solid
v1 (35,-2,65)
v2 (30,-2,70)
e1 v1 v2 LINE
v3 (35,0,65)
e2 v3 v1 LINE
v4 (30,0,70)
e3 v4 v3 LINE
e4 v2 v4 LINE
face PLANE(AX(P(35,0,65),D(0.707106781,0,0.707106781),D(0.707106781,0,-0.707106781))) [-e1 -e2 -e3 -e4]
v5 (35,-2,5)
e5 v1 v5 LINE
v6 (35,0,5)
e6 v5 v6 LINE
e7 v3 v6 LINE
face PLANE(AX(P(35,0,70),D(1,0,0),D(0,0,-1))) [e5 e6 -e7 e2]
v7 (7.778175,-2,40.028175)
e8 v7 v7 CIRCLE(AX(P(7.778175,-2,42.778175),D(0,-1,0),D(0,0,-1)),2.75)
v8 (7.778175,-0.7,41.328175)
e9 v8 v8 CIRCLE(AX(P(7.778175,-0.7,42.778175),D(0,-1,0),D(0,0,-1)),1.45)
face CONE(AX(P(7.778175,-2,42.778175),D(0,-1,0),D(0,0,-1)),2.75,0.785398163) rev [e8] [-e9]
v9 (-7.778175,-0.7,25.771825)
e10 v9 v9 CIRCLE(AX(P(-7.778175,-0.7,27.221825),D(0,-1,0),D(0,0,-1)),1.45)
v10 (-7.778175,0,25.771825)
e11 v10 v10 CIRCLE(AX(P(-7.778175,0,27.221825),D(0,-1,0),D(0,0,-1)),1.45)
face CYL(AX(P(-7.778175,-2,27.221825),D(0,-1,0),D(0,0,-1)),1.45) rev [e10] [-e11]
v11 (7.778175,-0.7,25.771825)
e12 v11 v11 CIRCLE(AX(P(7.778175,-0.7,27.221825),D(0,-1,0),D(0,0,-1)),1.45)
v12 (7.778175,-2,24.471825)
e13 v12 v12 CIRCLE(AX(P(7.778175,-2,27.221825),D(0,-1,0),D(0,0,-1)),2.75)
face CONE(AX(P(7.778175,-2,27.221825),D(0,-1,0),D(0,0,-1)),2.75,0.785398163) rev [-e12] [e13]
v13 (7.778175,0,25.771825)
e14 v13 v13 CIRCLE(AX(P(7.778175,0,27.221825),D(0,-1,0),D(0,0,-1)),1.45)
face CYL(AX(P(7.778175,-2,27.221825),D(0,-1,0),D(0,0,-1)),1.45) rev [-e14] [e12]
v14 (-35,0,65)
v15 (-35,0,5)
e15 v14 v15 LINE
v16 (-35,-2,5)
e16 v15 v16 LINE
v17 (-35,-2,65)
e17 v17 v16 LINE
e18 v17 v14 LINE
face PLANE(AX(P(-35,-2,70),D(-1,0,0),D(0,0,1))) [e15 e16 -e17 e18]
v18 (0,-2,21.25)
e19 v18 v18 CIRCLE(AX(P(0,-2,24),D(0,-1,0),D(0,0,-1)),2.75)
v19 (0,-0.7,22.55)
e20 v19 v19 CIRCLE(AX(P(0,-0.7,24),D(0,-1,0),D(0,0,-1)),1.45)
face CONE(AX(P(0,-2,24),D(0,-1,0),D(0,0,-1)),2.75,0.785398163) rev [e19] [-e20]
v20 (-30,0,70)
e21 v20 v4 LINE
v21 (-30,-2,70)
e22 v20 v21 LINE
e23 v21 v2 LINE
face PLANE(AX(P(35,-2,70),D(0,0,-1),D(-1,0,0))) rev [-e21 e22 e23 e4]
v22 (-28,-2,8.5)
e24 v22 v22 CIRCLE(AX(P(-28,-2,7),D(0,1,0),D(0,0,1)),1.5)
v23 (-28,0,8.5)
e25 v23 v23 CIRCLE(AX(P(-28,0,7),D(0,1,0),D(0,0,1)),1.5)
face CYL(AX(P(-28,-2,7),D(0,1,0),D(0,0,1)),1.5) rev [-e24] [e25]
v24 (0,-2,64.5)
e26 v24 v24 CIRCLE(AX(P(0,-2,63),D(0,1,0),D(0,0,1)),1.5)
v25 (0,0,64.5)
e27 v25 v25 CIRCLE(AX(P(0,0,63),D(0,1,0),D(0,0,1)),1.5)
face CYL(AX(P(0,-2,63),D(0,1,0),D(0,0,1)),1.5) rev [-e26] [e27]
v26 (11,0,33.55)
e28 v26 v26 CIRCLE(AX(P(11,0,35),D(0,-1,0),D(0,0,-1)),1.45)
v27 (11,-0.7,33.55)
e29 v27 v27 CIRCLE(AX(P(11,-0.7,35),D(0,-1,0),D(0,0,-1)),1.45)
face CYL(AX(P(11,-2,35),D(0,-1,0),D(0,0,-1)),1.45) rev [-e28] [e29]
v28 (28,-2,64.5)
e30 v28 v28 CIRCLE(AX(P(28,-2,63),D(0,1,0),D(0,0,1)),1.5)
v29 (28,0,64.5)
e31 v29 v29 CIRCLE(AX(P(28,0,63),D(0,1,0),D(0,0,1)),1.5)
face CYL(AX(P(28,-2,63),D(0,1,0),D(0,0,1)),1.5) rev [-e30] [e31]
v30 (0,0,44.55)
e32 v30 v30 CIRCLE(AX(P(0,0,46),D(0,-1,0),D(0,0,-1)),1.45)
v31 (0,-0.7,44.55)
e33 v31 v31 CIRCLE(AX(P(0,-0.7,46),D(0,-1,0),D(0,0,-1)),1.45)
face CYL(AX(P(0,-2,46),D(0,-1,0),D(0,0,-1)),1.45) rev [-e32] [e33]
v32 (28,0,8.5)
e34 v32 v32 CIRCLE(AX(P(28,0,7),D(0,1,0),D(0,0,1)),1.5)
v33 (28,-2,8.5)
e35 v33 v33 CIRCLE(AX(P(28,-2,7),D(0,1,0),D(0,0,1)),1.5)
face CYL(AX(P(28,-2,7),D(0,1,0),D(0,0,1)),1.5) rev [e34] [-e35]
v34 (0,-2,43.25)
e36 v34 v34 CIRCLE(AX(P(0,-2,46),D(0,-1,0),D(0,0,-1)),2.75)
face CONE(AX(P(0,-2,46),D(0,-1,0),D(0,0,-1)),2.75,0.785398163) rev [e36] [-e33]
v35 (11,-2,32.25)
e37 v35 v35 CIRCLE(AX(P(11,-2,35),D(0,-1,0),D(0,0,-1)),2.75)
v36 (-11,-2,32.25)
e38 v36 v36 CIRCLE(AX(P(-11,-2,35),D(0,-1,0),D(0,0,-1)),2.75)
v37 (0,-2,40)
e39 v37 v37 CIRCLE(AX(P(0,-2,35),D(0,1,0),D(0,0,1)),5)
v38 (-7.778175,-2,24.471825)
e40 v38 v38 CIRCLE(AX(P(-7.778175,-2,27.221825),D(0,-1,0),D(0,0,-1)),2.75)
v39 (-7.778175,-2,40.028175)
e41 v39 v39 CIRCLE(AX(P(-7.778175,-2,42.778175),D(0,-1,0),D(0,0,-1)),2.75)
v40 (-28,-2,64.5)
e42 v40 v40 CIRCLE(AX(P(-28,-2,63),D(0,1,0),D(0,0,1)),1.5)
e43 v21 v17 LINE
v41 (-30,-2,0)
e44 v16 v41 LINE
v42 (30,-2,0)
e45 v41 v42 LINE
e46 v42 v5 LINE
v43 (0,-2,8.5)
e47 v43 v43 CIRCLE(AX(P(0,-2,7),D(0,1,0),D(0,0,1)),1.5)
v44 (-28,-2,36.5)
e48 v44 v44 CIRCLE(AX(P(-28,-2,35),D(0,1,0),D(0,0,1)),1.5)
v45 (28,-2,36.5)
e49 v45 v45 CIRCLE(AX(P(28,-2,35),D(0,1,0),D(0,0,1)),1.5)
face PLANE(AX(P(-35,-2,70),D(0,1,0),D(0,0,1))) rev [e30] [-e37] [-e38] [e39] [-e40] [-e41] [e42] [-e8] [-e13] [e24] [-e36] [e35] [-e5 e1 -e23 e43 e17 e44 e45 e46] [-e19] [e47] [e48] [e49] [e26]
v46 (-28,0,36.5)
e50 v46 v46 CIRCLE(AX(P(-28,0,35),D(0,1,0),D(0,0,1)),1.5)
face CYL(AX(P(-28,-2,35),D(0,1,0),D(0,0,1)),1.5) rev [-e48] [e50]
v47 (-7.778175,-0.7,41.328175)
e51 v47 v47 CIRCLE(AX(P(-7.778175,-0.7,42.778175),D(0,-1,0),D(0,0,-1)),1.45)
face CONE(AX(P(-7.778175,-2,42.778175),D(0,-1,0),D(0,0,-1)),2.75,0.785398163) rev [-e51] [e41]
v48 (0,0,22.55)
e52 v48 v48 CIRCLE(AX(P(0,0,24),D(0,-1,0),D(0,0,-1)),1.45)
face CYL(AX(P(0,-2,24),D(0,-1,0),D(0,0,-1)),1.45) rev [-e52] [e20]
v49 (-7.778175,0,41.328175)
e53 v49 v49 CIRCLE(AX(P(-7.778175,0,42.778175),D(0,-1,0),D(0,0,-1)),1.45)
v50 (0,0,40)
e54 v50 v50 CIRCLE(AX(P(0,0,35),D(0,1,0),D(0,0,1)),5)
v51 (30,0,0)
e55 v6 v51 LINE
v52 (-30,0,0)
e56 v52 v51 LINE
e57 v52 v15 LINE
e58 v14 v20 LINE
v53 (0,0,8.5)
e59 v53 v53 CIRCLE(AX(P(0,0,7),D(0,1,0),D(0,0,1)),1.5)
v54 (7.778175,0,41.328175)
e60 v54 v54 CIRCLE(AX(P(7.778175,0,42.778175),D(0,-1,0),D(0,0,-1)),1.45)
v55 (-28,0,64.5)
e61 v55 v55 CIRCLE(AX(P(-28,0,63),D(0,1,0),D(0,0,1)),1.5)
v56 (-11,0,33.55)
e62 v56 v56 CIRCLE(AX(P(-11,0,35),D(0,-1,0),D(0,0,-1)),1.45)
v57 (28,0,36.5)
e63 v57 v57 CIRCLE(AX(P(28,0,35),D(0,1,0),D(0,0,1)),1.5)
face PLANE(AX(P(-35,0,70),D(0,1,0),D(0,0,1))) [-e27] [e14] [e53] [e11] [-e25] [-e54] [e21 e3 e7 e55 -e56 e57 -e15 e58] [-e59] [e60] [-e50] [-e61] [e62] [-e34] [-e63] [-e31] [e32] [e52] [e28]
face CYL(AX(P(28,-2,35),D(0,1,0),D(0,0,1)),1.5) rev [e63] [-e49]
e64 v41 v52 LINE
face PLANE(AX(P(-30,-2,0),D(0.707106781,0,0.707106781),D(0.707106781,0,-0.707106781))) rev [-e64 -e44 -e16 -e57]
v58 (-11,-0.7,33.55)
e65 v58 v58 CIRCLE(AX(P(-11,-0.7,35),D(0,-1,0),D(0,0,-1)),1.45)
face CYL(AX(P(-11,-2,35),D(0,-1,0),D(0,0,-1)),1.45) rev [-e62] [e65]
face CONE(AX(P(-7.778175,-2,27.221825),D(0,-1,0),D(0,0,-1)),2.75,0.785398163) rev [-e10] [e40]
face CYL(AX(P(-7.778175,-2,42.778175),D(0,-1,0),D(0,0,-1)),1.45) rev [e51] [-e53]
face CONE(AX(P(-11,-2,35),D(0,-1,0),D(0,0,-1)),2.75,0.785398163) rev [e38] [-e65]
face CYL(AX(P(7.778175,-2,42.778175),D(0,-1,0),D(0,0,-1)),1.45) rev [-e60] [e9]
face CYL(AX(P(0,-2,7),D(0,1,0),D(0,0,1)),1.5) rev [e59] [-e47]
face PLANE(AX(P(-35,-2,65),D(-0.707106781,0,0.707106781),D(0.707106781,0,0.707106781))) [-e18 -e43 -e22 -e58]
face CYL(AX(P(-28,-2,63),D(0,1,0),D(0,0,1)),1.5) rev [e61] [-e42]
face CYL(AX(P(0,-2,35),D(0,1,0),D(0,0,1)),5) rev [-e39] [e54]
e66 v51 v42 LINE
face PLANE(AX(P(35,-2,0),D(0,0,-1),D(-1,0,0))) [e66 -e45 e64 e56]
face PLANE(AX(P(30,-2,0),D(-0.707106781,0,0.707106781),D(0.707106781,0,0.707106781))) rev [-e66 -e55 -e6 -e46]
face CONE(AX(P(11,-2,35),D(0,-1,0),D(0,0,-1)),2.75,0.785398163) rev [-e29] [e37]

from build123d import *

# Parameters (mm, degrees)
SKETCH1_W                                    = 70
SKETCH1_H                                    = 2
BASE_FLANGE1_DEPTH                           = 70
SKETCH3_R                                    = 5
CUT_EXTRUDE1_DEPTH                           = 79.287930104
CHAMFER1_SIZE                                = 5
SKETCH4_R                                    = 1.25
CUT_EXTRUDE2_DEPTH                           = 79.287930104
CSK_FOR_M2_5_COUNTERSUNK_RAISED_HEAD_2_COUNT = 2
CSK_FOR_M2_5_COUNTERSUNK_RAISED_HEAD_2_PITCH = 8.419035512
CSK_FOR_M2_5_COUNTERSUNK_RAISED_HEAD_3_COUNT = 2
CSK_FOR_M2_5_COUNTERSUNK_RAISED_HEAD_3_PITCH = 15.556349186
CSK_FOR_M2_5_COUNTERSUNK_RAISED_HEAD_4_COUNT = 2
CSK_FOR_M2_5_COUNTERSUNK_RAISED_HEAD_4_PITCH = 20.325349715
CSK_FOR_M2_5_COUNTERSUNK_RAISED_HEAD_5_COUNT = 2
CSK_FOR_M2_5_COUNTERSUNK_RAISED_HEAD_5_PITCH = 22
CSK_FOR_M2_5_COUNTERSUNK_RAISED_HEAD_6_COUNT = 2
CSK_FOR_M2_5_COUNTERSUNK_RAISED_HEAD_6_PITCH = 20.325349715
CSK_FOR_M2_5_COUNTERSUNK_RAISED_HEAD_7_COUNT = 2
CSK_FOR_M2_5_COUNTERSUNK_RAISED_HEAD_7_PITCH = 15.556349186
CSK_FOR_M2_5_COUNTERSUNK_RAISED_HEAD_8_COUNT = 2
CSK_FOR_M2_5_COUNTERSUNK_RAISED_HEAD_8_PITCH = 8.419035512
SKETCH6_R                                    = 1.5
CUT_EXTRUDE3_DEPTH                           = 79.287930104


# Sheet-metal steps are written as plain solids
with BuildPart() as part:
    # Sketch1 → Base-Flange1 (new body)
    with BuildSketch(Plane.XY):
        with Locations((0, -1)):
            Rectangle(SKETCH1_W, SKETCH1_H)
    extrude(amount=BASE_FLANGE1_DEPTH)

    # Sketch3 → Cut-Extrude1 (cut, through all)
    with BuildSketch(Plane(origin=(0, 0, 0), x_dir=(1, 0, 0), z_dir=(0, 1, 0))):
        with Locations(Location((0, -35, 0), (0, 0, 270))):
            Circle(SKETCH3_R)
    extrude(amount=-CUT_EXTRUDE1_DEPTH, mode=Mode.SUBTRACT)

    # Chamfer1
    chamfer1_edges = [part.edges().sort_by_distance(p)[0] for p in [
        (-35, -1, 70),
        (-35, -1, 0),
        (35, -1, 0),
        (35, -1, 70),
    ]]
    chamfer(chamfer1_edges, length=CHAMFER1_SIZE)

    # Sketch4 → Cut-Extrude2 (cut, through all)
    with BuildSketch(Plane(origin=(0, 0, 0), x_dir=(1, 0, 0), z_dir=(0, 1, 0))):
        with Locations(Location((11, -35, 0), (0, 0, 270))):
            Circle(SKETCH4_R)
        with Locations(Location((-11, -35, 0), (0, 0, 270))):
            Circle(SKETCH4_R)
        with Locations(Location((0, -46, 0), (0, 0, 270))):
            Circle(SKETCH4_R)
        with Locations(Location((0, -24, 0), (0, 0, 270))):
            Circle(SKETCH4_R)
        with Locations(Location((7.778174593, -42.778174593, 0), (0, 0, 270))):
            Circle(SKETCH4_R)
        with Locations(Location((7.778174593, -27.221825407, 0), (0, 0, 270))):
            Circle(SKETCH4_R)
        with Locations(Location((-7.778174593, -27.221825407, 0), (0, 0, 270))):
            Circle(SKETCH4_R)
        with Locations(Location((-7.778174593, -42.778174593, 0), (0, 0, 270))):
            Circle(SKETCH4_R)
    extrude(amount=-CUT_EXTRUDE2_DEPTH, mode=Mode.SUBTRACT)

    # Sketch5 → CSK for M2.5 Countersunk Raised Head Screw1 (revolve, cut)
    with BuildSketch(Plane(origin=(0, -2, 46), x_dir=(0, 0, -1), z_dir=(1, 0, 0))):
        Polygon((0, 0), (0, 2), (1.45, 2), (1.45, 1.3), (2.75, 0), align=None)
    csk_for_m2_5_countersunk_raised_head_scr = revolve(axis=Axis((0, -8.35, 46), (0, 1, 0)), mode=Mode.SUBTRACT)

    # CSK for M2.5 Countersunk Raised Head 2: CSK for M2.5 Countersunk Raised Head Screw1 ×2
    with Locations(*[Vector(-0.9238795325112854, 0, -0.382683432365093) * (i * CSK_FOR_M2_5_COUNTERSUNK_RAISED_HEAD_2_PITCH) for i in range(1, CSK_FOR_M2_5_COUNTERSUNK_RAISED_HEAD_2_COUNT)]):
        add(csk_for_m2_5_countersunk_raised_head_scr, mode=Mode.SUBTRACT)

    # CSK for M2.5 Countersunk Raised Head 3: CSK for M2.5 Countersunk Raised Head Screw1 ×2
    with Locations(*[Vector(-0.7071067811865474, 0, -0.7071067811865478) * (i * CSK_FOR_M2_5_COUNTERSUNK_RAISED_HEAD_3_PITCH) for i in range(1, CSK_FOR_M2_5_COUNTERSUNK_RAISED_HEAD_3_COUNT)]):
        add(csk_for_m2_5_countersunk_raised_head_scr, mode=Mode.SUBTRACT)

    # CSK for M2.5 Countersunk Raised Head 4: CSK for M2.5 Countersunk Raised Head Screw1 ×2
    with Locations(*[Vector(-0.3826834323650891, 0, -0.9238795325112871) * (i * CSK_FOR_M2_5_COUNTERSUNK_RAISED_HEAD_4_PITCH) for i in range(1, CSK_FOR_M2_5_COUNTERSUNK_RAISED_HEAD_4_COUNT)]):
        add(csk_for_m2_5_countersunk_raised_head_scr, mode=Mode.SUBTRACT)

    # CSK for M2.5 Countersunk Raised Head 5: CSK for M2.5 Countersunk Raised Head Screw1 ×2
    with Locations(*[(0, 0, -i * CSK_FOR_M2_5_COUNTERSUNK_RAISED_HEAD_5_PITCH) for i in range(1, CSK_FOR_M2_5_COUNTERSUNK_RAISED_HEAD_5_COUNT)]):
        add(csk_for_m2_5_countersunk_raised_head_scr, mode=Mode.SUBTRACT)

    # CSK for M2.5 Countersunk Raised Head 6: CSK for M2.5 Countersunk Raised Head Screw1 ×2
    with Locations(*[Vector(0.3826834323650891, 0, -0.9238795325112871) * (i * CSK_FOR_M2_5_COUNTERSUNK_RAISED_HEAD_6_PITCH) for i in range(1, CSK_FOR_M2_5_COUNTERSUNK_RAISED_HEAD_6_COUNT)]):
        add(csk_for_m2_5_countersunk_raised_head_scr, mode=Mode.SUBTRACT)

    # CSK for M2.5 Countersunk Raised Head 7: CSK for M2.5 Countersunk Raised Head Screw1 ×2
    with Locations(*[Vector(0.7071067811865474, 0, -0.7071067811865478) * (i * CSK_FOR_M2_5_COUNTERSUNK_RAISED_HEAD_7_PITCH) for i in range(1, CSK_FOR_M2_5_COUNTERSUNK_RAISED_HEAD_7_COUNT)]):
        add(csk_for_m2_5_countersunk_raised_head_scr, mode=Mode.SUBTRACT)

    # CSK for M2.5 Countersunk Raised Head 8: CSK for M2.5 Countersunk Raised Head Screw1 ×2
    with Locations(*[Vector(0.9238795325112854, 0, -0.382683432365093) * (i * CSK_FOR_M2_5_COUNTERSUNK_RAISED_HEAD_8_PITCH) for i in range(1, CSK_FOR_M2_5_COUNTERSUNK_RAISED_HEAD_8_COUNT)]):
        add(csk_for_m2_5_countersunk_raised_head_scr, mode=Mode.SUBTRACT)

    # Sketch6 → Cut-Extrude3 (cut, through all)
    with BuildSketch(Plane(origin=(0, 0, 0), x_dir=(1, 0, 0), z_dir=(0, 1, 0))):
        with Locations(Location((-28, -7, 0), (0, 0, 270))):
            Circle(SKETCH6_R)
        with Locations(Location((0, -7, 0), (0, 0, 270))):
            Circle(SKETCH6_R)
        with Locations(Location((28, -7, 0), (0, 0, 270))):
            Circle(SKETCH6_R)
        with Locations(Location((28, -35, 0), (0, 0, 270))):
            Circle(SKETCH6_R)
        with Locations(Location((28, -63, 0), (0, 0, 270))):
            Circle(SKETCH6_R)
        with Locations(Location((0, -63, 0), (0, 0, 270))):
            Circle(SKETCH6_R)
        with Locations(Location((-28, -63, 0), (0, 0, 270))):
            Circle(SKETCH6_R)
        with Locations(Location((-28, -35, 0), (0, 0, 270))):
            Circle(SKETCH6_R)
    extrude(amount=-CUT_EXTRUDE3_DEPTH, mode=Mode.SUBTRACT)


solid = part.part
